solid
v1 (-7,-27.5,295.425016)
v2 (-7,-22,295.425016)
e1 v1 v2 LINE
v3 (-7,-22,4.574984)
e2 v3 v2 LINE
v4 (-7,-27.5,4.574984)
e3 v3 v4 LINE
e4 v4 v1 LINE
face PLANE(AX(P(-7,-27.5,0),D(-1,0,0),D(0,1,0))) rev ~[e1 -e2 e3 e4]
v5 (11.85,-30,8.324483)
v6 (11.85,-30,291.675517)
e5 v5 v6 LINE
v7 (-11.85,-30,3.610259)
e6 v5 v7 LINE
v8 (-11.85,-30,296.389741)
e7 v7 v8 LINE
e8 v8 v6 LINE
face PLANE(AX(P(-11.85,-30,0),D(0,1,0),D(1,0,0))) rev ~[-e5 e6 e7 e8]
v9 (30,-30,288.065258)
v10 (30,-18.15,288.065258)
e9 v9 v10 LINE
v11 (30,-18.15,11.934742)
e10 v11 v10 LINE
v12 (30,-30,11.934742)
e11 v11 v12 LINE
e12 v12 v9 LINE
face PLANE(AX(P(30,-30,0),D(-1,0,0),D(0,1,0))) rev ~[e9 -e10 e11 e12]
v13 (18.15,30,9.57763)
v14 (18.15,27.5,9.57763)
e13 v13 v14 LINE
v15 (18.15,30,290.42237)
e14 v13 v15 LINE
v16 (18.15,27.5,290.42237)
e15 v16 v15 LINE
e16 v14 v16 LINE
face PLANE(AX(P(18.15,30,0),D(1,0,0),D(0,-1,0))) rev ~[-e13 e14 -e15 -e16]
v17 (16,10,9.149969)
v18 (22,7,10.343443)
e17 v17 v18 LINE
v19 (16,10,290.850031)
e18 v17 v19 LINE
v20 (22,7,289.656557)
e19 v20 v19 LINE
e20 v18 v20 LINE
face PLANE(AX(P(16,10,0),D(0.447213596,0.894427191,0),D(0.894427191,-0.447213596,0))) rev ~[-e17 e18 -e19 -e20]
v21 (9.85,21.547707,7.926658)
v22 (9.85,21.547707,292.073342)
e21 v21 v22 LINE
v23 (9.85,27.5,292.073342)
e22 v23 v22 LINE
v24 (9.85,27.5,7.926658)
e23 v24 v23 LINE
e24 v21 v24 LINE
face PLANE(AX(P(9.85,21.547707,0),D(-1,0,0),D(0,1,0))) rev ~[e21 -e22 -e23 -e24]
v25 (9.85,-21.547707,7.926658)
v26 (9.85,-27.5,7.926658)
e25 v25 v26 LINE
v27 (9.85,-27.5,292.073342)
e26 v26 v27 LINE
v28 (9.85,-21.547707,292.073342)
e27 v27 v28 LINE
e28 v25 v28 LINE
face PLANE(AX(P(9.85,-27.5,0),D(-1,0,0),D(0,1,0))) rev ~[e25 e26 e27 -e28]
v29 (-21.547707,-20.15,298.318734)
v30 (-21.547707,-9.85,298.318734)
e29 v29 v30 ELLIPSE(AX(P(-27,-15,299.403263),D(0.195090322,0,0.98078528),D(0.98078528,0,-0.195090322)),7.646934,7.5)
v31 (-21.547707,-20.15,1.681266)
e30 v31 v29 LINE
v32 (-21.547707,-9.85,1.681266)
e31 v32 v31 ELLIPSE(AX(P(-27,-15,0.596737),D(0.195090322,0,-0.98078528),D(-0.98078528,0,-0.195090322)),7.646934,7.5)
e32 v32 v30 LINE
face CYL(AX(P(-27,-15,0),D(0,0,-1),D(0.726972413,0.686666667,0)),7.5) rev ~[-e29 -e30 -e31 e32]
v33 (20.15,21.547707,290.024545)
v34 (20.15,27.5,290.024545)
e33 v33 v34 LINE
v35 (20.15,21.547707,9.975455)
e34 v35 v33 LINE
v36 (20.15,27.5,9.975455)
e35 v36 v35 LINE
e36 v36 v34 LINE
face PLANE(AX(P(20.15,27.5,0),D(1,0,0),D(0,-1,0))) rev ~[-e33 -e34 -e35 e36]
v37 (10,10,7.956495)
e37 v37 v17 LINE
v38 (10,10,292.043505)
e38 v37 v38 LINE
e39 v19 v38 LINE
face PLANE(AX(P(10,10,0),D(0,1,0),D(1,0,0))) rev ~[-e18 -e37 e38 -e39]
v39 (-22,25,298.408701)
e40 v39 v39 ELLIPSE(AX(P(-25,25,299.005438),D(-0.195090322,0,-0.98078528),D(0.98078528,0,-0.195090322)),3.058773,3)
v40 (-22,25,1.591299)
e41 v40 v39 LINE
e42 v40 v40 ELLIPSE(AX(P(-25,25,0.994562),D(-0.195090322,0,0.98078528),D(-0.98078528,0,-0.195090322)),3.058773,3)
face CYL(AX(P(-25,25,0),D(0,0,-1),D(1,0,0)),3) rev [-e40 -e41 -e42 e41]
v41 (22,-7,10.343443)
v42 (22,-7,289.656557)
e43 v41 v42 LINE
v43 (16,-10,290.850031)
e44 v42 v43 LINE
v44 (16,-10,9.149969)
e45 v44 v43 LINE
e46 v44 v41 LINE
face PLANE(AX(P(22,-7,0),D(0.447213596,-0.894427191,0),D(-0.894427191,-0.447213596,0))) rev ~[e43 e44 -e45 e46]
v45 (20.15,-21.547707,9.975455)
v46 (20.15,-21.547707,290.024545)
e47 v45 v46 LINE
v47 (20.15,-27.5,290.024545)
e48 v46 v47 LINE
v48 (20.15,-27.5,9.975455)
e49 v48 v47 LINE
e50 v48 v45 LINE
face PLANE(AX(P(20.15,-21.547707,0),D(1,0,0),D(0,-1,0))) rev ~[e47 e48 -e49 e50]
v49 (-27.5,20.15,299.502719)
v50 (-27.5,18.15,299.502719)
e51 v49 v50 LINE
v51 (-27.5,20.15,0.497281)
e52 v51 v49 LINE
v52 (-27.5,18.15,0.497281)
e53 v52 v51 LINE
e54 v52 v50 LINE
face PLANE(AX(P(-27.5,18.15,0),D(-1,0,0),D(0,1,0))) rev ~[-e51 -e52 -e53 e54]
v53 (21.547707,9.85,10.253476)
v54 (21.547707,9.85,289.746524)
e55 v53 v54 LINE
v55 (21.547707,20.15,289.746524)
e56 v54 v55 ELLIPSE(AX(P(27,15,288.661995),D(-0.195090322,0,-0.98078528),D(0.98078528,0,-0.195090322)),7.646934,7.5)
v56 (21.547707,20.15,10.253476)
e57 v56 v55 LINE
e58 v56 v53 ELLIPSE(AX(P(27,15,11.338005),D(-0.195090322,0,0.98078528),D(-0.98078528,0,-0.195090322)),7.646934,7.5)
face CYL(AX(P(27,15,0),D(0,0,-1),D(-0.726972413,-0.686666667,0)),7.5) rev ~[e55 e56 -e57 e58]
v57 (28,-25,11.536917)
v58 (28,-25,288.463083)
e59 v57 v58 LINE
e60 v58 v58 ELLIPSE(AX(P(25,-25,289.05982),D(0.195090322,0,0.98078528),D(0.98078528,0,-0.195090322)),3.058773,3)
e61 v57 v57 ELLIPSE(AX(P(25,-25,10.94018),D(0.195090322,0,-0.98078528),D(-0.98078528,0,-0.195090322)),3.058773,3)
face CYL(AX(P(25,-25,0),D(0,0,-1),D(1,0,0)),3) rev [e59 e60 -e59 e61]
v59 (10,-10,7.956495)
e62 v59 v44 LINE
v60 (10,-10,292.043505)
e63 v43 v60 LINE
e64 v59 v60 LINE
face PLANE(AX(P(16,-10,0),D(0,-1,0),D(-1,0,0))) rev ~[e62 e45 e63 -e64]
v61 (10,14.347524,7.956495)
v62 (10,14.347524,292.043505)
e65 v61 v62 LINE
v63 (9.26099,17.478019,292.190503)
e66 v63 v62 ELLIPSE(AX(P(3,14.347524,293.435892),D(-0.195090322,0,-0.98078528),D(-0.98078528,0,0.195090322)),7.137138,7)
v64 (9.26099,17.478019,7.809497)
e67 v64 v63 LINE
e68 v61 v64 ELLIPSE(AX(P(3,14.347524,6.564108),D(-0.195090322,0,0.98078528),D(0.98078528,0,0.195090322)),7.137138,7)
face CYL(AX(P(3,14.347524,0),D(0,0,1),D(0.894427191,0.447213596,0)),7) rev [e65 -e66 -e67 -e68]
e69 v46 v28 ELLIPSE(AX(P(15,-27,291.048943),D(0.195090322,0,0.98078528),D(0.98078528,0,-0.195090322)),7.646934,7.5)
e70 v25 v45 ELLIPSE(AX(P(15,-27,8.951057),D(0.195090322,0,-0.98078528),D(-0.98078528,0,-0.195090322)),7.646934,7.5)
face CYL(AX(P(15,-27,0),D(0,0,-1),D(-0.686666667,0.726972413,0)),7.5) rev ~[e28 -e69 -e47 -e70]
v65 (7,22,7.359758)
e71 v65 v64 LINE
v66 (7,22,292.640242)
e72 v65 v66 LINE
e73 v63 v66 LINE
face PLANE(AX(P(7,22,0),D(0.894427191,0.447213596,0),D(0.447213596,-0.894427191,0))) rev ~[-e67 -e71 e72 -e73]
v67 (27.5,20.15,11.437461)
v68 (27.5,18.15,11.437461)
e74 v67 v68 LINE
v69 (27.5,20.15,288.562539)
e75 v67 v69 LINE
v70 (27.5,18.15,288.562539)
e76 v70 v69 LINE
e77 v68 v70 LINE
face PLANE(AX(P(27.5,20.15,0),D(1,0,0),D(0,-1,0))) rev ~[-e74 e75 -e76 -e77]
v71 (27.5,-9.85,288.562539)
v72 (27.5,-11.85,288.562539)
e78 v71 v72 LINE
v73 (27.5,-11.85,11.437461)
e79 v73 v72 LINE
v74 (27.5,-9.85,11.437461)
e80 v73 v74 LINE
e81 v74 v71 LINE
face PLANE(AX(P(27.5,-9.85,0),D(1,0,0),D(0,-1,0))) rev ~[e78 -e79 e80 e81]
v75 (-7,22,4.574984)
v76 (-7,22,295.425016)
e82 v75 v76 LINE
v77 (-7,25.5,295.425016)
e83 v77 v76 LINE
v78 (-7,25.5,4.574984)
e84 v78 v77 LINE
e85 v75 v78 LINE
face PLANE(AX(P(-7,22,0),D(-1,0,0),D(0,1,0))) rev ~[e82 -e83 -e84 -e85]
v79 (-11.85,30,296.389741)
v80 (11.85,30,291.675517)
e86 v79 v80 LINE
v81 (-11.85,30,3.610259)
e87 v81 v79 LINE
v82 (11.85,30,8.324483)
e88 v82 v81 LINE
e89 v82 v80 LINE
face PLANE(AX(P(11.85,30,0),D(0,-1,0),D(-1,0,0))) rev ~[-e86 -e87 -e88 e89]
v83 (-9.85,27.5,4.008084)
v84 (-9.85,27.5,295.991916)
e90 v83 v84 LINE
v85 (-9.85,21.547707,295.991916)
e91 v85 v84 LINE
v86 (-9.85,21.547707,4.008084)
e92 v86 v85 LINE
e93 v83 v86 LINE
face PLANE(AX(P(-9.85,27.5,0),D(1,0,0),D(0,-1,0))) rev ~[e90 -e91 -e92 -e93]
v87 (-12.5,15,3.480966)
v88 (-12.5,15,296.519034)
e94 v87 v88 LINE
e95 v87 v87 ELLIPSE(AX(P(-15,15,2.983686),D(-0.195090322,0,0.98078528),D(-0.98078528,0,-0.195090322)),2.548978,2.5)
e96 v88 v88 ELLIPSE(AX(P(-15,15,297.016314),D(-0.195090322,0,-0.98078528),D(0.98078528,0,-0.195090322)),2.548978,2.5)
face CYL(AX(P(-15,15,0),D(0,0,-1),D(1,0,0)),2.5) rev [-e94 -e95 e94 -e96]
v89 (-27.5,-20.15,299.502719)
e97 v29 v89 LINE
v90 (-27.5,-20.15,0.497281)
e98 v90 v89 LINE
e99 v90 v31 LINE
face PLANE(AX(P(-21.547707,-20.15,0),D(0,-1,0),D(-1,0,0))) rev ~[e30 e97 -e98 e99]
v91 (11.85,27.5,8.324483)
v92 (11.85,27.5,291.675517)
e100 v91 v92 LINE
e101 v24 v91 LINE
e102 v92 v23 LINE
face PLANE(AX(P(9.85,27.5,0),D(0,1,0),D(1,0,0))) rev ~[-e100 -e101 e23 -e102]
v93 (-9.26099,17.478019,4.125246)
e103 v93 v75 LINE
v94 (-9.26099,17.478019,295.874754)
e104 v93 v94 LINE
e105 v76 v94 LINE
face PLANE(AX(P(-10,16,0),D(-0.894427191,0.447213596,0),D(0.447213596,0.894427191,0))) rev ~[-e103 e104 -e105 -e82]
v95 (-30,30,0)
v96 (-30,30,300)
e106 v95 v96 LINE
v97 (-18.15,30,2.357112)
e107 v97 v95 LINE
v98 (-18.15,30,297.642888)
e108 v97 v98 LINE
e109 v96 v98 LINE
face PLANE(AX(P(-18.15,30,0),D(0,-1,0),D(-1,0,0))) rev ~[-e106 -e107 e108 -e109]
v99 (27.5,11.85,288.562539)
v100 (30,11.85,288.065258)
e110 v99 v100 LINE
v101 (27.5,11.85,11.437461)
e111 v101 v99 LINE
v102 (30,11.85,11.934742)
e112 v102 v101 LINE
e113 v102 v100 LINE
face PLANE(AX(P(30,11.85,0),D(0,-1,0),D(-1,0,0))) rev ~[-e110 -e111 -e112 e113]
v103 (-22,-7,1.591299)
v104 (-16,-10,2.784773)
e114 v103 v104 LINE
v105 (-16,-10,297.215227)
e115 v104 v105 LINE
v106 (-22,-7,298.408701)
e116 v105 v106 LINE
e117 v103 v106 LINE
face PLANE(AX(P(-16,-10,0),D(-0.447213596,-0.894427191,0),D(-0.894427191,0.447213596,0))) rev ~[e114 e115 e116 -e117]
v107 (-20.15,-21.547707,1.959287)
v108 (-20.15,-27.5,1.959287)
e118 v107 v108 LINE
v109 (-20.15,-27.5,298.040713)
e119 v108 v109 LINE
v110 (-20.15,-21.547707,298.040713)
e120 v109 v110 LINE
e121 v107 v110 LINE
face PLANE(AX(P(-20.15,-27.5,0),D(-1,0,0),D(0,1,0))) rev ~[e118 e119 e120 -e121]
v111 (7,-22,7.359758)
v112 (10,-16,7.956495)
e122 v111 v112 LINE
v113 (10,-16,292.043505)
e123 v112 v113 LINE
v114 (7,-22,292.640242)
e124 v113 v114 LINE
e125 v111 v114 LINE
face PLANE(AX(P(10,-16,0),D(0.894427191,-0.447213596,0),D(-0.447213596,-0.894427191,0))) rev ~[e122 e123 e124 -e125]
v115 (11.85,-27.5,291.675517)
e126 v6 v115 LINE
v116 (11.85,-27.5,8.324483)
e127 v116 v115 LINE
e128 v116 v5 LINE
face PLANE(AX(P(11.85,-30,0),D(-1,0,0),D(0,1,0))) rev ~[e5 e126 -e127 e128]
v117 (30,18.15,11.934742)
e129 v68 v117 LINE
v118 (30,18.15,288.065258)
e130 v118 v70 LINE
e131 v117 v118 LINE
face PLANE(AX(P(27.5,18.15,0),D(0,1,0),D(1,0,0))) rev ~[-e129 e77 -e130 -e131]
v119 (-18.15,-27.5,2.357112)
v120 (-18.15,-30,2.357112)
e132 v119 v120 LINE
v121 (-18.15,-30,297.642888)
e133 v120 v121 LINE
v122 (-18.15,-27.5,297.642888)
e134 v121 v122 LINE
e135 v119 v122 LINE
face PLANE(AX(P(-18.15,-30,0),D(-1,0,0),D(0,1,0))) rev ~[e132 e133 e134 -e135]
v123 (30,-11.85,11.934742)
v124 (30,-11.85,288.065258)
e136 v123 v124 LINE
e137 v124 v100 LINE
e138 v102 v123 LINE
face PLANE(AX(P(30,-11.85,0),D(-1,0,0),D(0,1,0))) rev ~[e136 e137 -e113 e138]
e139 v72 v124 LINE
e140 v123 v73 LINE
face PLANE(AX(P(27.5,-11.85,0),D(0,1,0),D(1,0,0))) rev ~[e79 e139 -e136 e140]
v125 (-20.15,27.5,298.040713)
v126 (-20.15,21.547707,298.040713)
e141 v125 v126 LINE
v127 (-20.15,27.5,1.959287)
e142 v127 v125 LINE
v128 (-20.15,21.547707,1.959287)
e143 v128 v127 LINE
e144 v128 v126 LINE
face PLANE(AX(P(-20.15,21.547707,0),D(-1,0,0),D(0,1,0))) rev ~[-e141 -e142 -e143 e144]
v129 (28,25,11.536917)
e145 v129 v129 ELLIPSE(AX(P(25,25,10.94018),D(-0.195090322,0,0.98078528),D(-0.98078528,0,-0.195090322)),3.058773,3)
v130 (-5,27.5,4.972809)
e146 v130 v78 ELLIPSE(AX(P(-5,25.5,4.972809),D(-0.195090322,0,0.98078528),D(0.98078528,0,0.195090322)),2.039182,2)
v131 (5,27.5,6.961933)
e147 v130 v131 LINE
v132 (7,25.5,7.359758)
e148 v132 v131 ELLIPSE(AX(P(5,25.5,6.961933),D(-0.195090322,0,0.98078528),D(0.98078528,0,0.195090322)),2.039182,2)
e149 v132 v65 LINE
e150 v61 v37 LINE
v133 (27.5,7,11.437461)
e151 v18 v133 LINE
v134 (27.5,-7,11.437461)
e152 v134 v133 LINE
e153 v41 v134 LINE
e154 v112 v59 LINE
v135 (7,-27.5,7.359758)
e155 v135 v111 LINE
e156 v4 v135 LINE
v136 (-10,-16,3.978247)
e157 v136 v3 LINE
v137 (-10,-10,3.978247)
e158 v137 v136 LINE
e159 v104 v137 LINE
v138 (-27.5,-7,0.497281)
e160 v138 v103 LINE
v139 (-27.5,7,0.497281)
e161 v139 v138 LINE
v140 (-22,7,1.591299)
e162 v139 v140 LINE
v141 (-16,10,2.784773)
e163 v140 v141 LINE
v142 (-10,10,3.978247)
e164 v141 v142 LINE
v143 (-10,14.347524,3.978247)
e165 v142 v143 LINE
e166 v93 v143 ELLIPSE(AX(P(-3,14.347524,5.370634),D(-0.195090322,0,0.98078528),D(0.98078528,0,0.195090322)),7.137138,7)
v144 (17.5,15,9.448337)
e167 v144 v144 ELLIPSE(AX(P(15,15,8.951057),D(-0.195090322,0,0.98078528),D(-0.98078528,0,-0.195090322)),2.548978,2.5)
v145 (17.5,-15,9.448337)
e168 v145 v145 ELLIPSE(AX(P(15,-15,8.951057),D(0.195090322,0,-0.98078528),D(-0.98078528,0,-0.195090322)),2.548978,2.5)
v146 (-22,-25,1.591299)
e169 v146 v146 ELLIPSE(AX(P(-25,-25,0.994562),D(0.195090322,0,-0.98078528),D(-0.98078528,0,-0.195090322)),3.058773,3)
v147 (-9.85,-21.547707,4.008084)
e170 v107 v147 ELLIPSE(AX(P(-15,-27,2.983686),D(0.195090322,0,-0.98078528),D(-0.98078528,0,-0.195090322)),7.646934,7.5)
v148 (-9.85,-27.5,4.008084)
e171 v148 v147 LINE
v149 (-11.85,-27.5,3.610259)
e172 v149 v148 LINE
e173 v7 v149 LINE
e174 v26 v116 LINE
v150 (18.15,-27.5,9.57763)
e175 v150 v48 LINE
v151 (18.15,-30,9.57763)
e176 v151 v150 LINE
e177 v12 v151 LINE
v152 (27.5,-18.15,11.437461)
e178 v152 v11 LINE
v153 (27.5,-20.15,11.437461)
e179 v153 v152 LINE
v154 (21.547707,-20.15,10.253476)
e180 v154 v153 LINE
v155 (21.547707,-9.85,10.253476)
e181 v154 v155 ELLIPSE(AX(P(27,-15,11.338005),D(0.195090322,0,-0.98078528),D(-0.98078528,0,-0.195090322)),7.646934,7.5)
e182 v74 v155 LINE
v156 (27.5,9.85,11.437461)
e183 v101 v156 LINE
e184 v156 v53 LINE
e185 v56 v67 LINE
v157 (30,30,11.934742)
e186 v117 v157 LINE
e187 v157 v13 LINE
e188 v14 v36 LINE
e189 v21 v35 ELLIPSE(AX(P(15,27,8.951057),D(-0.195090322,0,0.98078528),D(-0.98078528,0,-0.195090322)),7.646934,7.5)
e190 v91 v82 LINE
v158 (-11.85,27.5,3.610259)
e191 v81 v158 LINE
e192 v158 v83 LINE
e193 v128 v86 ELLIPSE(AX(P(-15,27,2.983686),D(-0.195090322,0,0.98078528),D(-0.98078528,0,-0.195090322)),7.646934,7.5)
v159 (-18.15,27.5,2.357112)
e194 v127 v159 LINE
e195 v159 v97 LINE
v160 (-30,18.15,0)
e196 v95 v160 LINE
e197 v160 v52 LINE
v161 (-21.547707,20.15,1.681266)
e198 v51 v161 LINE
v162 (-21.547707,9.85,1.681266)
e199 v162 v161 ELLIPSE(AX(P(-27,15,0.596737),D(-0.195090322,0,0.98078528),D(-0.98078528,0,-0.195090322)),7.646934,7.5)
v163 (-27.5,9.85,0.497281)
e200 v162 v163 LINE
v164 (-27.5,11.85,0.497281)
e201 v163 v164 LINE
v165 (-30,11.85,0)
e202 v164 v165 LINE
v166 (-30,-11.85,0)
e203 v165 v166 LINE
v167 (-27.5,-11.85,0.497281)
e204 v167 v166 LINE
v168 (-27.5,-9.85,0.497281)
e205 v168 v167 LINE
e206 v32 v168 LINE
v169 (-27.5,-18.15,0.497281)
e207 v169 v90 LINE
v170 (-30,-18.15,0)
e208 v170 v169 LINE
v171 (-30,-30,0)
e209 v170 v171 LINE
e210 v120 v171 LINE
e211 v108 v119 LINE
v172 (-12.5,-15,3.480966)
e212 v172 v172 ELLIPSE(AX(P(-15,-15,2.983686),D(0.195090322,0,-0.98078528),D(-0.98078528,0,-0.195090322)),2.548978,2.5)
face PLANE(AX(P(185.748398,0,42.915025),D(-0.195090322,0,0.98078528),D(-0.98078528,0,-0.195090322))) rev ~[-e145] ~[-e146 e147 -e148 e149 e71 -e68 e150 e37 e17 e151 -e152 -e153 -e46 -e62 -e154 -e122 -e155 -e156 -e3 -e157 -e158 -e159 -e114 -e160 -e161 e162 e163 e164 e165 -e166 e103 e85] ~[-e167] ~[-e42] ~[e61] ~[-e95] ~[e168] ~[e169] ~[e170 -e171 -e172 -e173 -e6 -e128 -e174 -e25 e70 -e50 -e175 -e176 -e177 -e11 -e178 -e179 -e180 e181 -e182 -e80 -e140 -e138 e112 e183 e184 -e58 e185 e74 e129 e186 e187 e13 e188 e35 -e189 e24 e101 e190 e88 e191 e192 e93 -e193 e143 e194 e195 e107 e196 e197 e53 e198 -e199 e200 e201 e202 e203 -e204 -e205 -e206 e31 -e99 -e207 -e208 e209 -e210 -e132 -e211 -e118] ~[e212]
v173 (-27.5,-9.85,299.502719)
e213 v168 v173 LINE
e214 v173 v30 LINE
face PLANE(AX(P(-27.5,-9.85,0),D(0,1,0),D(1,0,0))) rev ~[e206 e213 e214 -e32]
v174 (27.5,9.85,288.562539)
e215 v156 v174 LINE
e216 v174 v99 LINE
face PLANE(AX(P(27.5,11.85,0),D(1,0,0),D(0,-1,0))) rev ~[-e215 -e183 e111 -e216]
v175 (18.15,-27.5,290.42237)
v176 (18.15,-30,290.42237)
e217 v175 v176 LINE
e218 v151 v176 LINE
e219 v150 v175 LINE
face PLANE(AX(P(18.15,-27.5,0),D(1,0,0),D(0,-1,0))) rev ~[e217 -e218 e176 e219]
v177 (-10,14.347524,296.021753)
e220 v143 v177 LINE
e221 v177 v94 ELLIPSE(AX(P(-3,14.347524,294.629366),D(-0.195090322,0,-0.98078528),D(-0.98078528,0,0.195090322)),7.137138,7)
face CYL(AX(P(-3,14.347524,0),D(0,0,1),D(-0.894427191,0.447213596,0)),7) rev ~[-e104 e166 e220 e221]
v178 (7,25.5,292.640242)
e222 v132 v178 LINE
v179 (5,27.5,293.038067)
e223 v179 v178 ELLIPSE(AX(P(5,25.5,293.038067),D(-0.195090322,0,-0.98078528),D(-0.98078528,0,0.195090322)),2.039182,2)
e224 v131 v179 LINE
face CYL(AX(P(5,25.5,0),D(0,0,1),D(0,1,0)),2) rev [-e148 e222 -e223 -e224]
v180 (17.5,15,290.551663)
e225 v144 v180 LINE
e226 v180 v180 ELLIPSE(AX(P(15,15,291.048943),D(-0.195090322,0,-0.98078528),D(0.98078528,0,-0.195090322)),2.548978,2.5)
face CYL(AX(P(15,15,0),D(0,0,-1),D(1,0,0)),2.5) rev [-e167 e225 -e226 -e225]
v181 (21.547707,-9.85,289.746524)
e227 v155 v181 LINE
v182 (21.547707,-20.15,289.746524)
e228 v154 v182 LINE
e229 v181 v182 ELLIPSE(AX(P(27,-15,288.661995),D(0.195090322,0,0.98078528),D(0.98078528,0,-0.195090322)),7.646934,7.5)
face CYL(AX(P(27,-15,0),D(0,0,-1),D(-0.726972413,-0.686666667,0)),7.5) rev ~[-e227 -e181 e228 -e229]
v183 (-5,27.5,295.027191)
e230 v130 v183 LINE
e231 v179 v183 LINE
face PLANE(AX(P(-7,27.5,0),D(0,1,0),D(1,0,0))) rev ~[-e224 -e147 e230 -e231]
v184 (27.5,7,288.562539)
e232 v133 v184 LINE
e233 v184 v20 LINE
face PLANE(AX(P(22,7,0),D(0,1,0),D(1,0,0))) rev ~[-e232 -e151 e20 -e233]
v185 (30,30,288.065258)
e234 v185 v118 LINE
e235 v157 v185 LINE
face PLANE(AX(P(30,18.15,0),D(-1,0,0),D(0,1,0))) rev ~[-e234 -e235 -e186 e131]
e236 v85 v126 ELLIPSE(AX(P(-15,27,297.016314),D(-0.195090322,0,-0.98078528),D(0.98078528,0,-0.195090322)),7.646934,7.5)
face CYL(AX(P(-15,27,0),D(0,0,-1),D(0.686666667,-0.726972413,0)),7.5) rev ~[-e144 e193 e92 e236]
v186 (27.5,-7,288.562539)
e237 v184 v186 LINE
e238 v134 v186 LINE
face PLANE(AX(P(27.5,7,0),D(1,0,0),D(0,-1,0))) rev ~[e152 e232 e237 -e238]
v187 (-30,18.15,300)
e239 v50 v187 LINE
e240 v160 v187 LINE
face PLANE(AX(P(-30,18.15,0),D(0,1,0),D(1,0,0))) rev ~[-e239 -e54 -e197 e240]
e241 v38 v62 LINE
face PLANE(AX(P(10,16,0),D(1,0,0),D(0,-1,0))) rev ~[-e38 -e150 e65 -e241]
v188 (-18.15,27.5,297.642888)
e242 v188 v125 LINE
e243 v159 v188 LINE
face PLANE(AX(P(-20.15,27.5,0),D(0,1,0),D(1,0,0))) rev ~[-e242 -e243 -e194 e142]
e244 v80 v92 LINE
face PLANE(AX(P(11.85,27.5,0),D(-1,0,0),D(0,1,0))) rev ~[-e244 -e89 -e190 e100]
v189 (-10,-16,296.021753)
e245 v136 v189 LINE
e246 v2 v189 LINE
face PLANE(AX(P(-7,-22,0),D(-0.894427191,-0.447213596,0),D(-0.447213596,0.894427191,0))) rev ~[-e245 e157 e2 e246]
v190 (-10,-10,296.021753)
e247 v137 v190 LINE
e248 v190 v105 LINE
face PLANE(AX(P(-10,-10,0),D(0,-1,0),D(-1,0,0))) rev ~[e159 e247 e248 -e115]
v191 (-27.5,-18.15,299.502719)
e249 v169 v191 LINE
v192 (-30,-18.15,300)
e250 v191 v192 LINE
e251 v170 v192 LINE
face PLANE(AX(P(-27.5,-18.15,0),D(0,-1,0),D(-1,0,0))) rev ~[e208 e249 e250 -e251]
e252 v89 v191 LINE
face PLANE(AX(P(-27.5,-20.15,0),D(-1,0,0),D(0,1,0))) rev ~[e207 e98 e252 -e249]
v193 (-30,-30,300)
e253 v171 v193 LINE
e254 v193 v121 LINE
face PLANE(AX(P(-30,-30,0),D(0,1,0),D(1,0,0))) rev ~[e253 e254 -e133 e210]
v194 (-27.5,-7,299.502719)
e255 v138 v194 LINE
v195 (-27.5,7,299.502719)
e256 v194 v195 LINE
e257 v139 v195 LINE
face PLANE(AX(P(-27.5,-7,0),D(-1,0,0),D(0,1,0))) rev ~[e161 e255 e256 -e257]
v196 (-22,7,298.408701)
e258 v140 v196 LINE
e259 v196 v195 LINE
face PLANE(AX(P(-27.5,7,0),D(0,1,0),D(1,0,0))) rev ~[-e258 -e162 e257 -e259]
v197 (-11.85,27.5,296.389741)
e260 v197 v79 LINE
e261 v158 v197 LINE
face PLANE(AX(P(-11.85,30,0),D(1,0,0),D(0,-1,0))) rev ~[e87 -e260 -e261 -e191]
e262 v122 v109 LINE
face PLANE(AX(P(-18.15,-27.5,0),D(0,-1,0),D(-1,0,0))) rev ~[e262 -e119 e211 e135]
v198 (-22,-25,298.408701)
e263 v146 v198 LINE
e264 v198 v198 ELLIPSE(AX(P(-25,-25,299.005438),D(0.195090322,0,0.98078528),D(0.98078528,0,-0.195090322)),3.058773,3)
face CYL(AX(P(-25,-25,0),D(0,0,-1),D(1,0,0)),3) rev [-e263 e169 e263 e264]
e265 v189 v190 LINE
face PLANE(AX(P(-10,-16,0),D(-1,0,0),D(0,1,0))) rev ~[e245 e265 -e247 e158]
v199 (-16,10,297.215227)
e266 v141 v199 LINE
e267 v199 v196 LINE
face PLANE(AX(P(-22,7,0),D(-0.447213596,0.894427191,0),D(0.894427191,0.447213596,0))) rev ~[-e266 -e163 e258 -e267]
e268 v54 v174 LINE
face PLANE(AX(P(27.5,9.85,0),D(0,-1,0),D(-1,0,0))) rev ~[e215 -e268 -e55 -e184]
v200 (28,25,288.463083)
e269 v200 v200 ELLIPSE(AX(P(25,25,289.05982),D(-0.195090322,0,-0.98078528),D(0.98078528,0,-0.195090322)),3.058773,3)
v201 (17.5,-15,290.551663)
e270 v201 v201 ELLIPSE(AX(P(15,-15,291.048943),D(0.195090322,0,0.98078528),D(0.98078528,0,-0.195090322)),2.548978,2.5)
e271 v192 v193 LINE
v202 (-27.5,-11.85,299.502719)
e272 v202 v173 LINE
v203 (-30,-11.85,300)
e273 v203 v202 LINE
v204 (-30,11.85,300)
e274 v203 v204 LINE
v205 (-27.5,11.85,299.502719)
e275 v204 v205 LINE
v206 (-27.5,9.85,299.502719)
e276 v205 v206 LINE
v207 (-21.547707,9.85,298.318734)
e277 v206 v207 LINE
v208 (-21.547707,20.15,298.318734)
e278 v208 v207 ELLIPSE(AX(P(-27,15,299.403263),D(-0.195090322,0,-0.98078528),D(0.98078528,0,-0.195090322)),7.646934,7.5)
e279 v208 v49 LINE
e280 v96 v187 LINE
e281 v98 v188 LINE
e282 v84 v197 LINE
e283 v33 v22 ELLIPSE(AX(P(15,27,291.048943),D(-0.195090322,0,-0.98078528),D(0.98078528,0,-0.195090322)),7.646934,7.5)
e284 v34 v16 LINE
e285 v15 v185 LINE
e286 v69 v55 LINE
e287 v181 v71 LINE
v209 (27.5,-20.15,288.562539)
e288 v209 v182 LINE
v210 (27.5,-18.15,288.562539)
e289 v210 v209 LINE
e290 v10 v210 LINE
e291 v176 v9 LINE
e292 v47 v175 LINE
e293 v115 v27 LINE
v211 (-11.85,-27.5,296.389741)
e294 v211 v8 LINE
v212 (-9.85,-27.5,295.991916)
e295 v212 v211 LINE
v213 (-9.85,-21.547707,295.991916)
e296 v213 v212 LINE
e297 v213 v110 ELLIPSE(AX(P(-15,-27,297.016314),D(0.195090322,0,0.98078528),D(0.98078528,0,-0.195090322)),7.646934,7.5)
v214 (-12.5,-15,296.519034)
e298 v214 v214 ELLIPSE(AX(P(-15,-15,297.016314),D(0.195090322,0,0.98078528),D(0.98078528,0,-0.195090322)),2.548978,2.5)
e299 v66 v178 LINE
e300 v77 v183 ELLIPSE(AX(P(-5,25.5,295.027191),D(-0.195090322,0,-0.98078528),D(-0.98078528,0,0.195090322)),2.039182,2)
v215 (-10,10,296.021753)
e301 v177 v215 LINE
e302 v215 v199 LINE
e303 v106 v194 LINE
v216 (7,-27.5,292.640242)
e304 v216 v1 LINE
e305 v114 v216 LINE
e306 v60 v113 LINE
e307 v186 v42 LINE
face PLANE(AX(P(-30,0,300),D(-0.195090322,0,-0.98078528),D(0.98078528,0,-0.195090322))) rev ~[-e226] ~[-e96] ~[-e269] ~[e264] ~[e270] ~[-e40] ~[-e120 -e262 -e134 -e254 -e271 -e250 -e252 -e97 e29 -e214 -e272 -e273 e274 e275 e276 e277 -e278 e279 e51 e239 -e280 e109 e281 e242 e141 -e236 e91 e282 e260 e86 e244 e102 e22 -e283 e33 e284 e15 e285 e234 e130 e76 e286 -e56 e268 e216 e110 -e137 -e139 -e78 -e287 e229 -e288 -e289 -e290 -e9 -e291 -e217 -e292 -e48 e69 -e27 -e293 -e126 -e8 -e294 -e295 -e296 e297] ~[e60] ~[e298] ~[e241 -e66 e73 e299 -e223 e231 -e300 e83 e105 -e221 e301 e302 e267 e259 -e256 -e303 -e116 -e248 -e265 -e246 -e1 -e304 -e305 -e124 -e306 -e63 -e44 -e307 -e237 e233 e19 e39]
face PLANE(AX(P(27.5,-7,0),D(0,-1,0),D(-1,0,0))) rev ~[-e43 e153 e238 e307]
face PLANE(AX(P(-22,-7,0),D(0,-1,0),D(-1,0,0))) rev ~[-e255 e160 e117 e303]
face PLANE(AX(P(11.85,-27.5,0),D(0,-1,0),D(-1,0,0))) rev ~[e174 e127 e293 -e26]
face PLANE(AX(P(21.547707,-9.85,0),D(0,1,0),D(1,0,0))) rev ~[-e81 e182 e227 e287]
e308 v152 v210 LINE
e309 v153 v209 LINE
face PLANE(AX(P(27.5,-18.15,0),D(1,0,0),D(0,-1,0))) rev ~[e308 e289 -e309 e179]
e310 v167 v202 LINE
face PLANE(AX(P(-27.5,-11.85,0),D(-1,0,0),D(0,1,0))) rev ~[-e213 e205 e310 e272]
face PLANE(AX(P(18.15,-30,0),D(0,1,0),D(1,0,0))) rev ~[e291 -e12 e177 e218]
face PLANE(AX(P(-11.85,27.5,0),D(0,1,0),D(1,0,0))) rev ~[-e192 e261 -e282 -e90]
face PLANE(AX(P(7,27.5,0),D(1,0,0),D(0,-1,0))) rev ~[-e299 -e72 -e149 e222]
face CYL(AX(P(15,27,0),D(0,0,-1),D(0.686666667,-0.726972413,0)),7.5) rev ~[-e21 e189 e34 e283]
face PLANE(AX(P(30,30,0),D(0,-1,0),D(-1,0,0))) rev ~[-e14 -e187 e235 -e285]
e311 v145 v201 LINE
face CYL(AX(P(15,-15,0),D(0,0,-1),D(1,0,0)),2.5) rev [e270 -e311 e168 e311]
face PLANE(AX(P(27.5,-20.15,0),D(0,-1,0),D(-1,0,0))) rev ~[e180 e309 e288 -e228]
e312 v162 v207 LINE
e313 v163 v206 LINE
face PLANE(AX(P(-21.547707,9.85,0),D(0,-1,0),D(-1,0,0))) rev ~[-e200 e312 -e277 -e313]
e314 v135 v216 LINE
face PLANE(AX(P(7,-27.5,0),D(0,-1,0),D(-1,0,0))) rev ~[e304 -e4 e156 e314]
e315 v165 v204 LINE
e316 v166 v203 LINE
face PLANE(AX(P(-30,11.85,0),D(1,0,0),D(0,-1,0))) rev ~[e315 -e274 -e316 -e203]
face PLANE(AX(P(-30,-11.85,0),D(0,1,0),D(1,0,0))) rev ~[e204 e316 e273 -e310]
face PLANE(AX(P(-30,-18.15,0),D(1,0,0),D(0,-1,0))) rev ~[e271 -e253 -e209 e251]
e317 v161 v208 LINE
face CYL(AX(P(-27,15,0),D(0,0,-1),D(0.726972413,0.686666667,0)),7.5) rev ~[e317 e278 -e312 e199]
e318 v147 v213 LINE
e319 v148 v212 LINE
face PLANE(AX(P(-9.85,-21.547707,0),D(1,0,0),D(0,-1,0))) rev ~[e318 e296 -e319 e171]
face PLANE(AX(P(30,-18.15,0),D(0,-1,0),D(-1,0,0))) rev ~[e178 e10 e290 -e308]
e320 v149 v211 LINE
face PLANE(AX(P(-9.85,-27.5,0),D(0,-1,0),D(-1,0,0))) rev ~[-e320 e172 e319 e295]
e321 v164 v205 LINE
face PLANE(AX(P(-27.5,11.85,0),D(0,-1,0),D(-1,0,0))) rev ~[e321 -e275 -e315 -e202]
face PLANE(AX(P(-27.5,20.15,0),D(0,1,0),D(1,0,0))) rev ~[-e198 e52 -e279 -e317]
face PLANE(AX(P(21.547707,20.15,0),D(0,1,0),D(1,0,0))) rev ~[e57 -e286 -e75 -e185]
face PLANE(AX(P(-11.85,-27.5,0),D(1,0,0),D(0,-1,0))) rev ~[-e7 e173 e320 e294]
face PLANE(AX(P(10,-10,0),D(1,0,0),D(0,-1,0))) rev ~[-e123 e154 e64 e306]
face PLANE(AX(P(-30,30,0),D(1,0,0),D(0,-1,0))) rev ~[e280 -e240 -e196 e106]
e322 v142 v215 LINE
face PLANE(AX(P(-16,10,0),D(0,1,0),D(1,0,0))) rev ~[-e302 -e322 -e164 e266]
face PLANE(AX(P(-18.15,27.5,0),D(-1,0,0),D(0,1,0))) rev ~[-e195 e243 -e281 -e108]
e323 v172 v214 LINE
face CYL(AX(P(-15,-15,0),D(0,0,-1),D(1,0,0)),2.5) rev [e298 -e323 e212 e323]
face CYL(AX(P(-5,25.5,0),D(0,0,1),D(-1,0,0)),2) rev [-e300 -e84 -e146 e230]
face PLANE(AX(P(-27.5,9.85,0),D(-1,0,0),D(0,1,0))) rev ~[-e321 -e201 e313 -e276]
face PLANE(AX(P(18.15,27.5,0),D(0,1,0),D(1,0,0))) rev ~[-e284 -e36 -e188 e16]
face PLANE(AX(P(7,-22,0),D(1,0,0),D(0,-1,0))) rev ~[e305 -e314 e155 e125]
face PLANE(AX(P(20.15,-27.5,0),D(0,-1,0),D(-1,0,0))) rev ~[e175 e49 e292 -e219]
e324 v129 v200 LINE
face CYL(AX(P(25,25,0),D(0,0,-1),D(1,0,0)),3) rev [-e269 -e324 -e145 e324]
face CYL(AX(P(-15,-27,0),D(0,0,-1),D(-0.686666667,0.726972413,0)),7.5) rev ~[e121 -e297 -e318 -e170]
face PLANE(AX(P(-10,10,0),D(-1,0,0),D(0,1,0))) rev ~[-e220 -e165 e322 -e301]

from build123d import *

# Parameters (mm, degrees)
F0_R          = 3
F0_R_2        = 2.5
F1_DEPTH      = 300
F2_R          = 2
F3_R          = 7
F6_DEPTH      = 30
F6_DEPTH_BACK = 30


# Not quite as in the source:
# - a feature names something its author has since deleted; it is built from what else it names


with BuildPart() as f1:
    # F0 (on Top) → F1 (new body)
    with BuildSketch(Plane.XY):
        with BuildLine():
            Line((18.15, -30), (30, -30))
            Line((30, -30), (30, -18.15))
            Line((30, -18.15), (27.5, -18.15))
            Line((27.5, -18.15), (27.5, -20.15))
            Line((27.5, -20.15), (21.5477069044, -20.15))
            ThreePointArc((21.5477069044, -20.15), (19.5, -15), (21.5477069044, -9.85))
            Line((21.5477069044, -9.85), (27.5, -9.85))
            Line((27.5, -9.85), (27.5, -11.85))
            Line((27.5, -11.85), (30, -11.85))
            Line((30, -11.85), (30, 11.85))
            Line((30, 11.85), (27.5, 11.85))
            Line((27.5, 11.85), (27.5, 9.85))
            Line((27.5, 9.85), (21.5477069044, 9.85))
            ThreePointArc((21.5477069044, 9.85), (19.5, 15), (21.5477069044, 20.15))
            Line((21.5477069044, 20.15), (27.5, 20.15))
            Line((27.5, 20.15), (27.5, 18.15))
            Line((27.5, 18.15), (30, 18.15))
            Line((30, 18.15), (30, 30))
            Line((30, 30), (18.15, 30))
            Line((18.15, 30), (18.15, 27.5))
            Line((18.15, 27.5), (20.15, 27.5))
            Line((20.15, 27.5), (20.15, 21.5477069044))
            ThreePointArc((20.15, 21.5477069044), (15, 19.5), (9.85, 21.5477069044))
            Line((9.85, 21.5477069044), (9.85, 27.5))
            Line((9.85, 27.5), (11.85, 27.5))
            Line((11.85, 27.5), (11.85, 30))
            Line((11.85, 30), (-11.85, 30))
            Line((-11.85, 30), (-11.85, 27.5))
            Line((-11.85, 27.5), (-9.85, 27.5))
            Line((-9.85, 27.5), (-9.85, 21.5477069044))
            ThreePointArc((-9.85, 21.5477069044), (-15, 19.5), (-20.15, 21.5477069044))
            Line((-20.15, 21.5477069044), (-20.15, 27.5))
            Line((-20.15, 27.5), (-18.15, 27.5))
            Line((-18.15, 27.5), (-18.15, 30))
            Line((-18.15, 30), (-30, 30))
            Line((-30, 30), (-30, 18.15))
            Line((-30, 18.15), (-27.5, 18.15))
            Line((-27.5, 18.15), (-27.5, 20.15))
            Line((-27.5, 20.15), (-21.5477069044, 20.15))
            ThreePointArc((-21.5477069044, 20.15), (-19.5, 15), (-21.5477069044, 9.85))
            Line((-21.5477069044, 9.85), (-27.5, 9.85))
            Line((-27.5, 9.85), (-27.5, 11.85))
            Line((-27.5, 11.85), (-30, 11.85))
            Line((-30, 11.85), (-30, -11.85))
            Line((-30, -11.85), (-27.5, -11.85))
            Line((-27.5, -11.85), (-27.5, -9.85))
            Line((-27.5, -9.85), (-21.5477069044, -9.85))
            ThreePointArc((-21.5477069044, -9.85), (-19.5, -15), (-21.5477069044, -20.15))
            Line((-21.5477069044, -20.15), (-27.5, -20.15))
            Line((-27.5, -20.15), (-27.5, -18.15))
            Line((-27.5, -18.15), (-30, -18.15))
            Line((-30, -18.15), (-30, -30))
            Line((-30, -30), (-18.15, -30))
            Line((-18.15, -30), (-18.15, -27.5))
            Line((-18.15, -27.5), (-20.15, -27.5))
            Line((-20.15, -27.5), (-20.15, -21.5477069044))
            ThreePointArc((-20.15, -21.5477069044), (-15, -19.5), (-9.85, -21.5477069044))
            Line((-9.85, -21.5477069044), (-9.85, -27.5))
            Line((-9.85, -27.5), (-11.85, -27.5))
            Line((-11.85, -27.5), (-11.85, -30))
            Line((-11.85, -30), (11.85, -30))
            Line((11.85, -30), (11.85, -27.5))
            Line((11.85, -27.5), (9.85, -27.5))
            Line((9.85, -27.5), (9.85, -21.5477069044))
            ThreePointArc((9.85, -21.5477069044), (15, -19.5), (20.15, -21.5477069044))
            Line((20.15, -21.5477069044), (20.15, -27.5))
            Line((20.15, -27.5), (18.15, -27.5))
            Line((18.15, -27.5), (18.15, -30))
        make_face()
        with Locations((-25, -25)):
            Circle(F0_R, mode=Mode.SUBTRACT)
        with Locations((-15, -15)):
            Circle(F0_R_2, mode=Mode.SUBTRACT)
        with Locations((25, -25)):
            Circle(F0_R, mode=Mode.SUBTRACT)
        with Locations((15, -15)):
            Circle(F0_R_2, mode=Mode.SUBTRACT)
        with Locations((-25, 25)):
            Circle(F0_R, mode=Mode.SUBTRACT)
        with Locations((-15, 15)):
            Circle(F0_R_2, mode=Mode.SUBTRACT)
        Polygon((-7, 22), (-7, 27.5), (0, 27.5), (7, 27.5), (7, 22), (10, 16), (10, 10), (16, 10), (22, 7), (27.5, 7), (27.5, 0), (27.5, -7), (22, -7), (16, -10), (10, -10), (10, -16), (7, -22), (7, -27.5), (0, -27.5), (-7, -27.5), (-7, -22), (-10, -16), (-10, -10), (-16, -10), (-22, -7), (-27.5, -7), (-27.5, 0), (-27.5, 7), (-22, 7), (-16, 10), (-10, 10), (-10, 16), align=None, mode=Mode.SUBTRACT)
        with Locations((15, 15)):
            Circle(F0_R_2, mode=Mode.SUBTRACT)
        with Locations((25, 25)):
            Circle(F0_R, mode=Mode.SUBTRACT)
    extrude(amount=F1_DEPTH)

    # F2
    f2_edges = [f1.edges().sort_by_distance(p)[0] for p in [
        (-7, 27.5, 150),
        (7, 27.5, 150),
    ]]
    fillet(f2_edges, radius=F2_R)

    # F3
    f3_edges = [f1.edges().sort_by_distance(p)[0] for p in [
        (-10, 16, 150),
        (10, 16, 150),
    ]]
    fillet(f3_edges, radius=F3_R)

    # F5 (on Front) → F6 (cut, two sides)
    with BuildSketch(Plane.XZ) as f6_sk:
        Polygon((-5.0746062651, -125.30841628), (210.6737913168, -82.3933917586), (185.748397582, 42.9150245214), (-30, 0), align=None)
        Polygon((73.2666294749, 279.4589902598), (110.3184495721, 465.7310686897), (7.0518200972, 486.2720784299), (-30, 300), align=None)
    extrude(amount=F6_DEPTH, mode=Mode.SUBTRACT)
    extrude(f6_sk.sketch, amount=-F6_DEPTH_BACK, mode=Mode.SUBTRACT)


solid = f1.part
